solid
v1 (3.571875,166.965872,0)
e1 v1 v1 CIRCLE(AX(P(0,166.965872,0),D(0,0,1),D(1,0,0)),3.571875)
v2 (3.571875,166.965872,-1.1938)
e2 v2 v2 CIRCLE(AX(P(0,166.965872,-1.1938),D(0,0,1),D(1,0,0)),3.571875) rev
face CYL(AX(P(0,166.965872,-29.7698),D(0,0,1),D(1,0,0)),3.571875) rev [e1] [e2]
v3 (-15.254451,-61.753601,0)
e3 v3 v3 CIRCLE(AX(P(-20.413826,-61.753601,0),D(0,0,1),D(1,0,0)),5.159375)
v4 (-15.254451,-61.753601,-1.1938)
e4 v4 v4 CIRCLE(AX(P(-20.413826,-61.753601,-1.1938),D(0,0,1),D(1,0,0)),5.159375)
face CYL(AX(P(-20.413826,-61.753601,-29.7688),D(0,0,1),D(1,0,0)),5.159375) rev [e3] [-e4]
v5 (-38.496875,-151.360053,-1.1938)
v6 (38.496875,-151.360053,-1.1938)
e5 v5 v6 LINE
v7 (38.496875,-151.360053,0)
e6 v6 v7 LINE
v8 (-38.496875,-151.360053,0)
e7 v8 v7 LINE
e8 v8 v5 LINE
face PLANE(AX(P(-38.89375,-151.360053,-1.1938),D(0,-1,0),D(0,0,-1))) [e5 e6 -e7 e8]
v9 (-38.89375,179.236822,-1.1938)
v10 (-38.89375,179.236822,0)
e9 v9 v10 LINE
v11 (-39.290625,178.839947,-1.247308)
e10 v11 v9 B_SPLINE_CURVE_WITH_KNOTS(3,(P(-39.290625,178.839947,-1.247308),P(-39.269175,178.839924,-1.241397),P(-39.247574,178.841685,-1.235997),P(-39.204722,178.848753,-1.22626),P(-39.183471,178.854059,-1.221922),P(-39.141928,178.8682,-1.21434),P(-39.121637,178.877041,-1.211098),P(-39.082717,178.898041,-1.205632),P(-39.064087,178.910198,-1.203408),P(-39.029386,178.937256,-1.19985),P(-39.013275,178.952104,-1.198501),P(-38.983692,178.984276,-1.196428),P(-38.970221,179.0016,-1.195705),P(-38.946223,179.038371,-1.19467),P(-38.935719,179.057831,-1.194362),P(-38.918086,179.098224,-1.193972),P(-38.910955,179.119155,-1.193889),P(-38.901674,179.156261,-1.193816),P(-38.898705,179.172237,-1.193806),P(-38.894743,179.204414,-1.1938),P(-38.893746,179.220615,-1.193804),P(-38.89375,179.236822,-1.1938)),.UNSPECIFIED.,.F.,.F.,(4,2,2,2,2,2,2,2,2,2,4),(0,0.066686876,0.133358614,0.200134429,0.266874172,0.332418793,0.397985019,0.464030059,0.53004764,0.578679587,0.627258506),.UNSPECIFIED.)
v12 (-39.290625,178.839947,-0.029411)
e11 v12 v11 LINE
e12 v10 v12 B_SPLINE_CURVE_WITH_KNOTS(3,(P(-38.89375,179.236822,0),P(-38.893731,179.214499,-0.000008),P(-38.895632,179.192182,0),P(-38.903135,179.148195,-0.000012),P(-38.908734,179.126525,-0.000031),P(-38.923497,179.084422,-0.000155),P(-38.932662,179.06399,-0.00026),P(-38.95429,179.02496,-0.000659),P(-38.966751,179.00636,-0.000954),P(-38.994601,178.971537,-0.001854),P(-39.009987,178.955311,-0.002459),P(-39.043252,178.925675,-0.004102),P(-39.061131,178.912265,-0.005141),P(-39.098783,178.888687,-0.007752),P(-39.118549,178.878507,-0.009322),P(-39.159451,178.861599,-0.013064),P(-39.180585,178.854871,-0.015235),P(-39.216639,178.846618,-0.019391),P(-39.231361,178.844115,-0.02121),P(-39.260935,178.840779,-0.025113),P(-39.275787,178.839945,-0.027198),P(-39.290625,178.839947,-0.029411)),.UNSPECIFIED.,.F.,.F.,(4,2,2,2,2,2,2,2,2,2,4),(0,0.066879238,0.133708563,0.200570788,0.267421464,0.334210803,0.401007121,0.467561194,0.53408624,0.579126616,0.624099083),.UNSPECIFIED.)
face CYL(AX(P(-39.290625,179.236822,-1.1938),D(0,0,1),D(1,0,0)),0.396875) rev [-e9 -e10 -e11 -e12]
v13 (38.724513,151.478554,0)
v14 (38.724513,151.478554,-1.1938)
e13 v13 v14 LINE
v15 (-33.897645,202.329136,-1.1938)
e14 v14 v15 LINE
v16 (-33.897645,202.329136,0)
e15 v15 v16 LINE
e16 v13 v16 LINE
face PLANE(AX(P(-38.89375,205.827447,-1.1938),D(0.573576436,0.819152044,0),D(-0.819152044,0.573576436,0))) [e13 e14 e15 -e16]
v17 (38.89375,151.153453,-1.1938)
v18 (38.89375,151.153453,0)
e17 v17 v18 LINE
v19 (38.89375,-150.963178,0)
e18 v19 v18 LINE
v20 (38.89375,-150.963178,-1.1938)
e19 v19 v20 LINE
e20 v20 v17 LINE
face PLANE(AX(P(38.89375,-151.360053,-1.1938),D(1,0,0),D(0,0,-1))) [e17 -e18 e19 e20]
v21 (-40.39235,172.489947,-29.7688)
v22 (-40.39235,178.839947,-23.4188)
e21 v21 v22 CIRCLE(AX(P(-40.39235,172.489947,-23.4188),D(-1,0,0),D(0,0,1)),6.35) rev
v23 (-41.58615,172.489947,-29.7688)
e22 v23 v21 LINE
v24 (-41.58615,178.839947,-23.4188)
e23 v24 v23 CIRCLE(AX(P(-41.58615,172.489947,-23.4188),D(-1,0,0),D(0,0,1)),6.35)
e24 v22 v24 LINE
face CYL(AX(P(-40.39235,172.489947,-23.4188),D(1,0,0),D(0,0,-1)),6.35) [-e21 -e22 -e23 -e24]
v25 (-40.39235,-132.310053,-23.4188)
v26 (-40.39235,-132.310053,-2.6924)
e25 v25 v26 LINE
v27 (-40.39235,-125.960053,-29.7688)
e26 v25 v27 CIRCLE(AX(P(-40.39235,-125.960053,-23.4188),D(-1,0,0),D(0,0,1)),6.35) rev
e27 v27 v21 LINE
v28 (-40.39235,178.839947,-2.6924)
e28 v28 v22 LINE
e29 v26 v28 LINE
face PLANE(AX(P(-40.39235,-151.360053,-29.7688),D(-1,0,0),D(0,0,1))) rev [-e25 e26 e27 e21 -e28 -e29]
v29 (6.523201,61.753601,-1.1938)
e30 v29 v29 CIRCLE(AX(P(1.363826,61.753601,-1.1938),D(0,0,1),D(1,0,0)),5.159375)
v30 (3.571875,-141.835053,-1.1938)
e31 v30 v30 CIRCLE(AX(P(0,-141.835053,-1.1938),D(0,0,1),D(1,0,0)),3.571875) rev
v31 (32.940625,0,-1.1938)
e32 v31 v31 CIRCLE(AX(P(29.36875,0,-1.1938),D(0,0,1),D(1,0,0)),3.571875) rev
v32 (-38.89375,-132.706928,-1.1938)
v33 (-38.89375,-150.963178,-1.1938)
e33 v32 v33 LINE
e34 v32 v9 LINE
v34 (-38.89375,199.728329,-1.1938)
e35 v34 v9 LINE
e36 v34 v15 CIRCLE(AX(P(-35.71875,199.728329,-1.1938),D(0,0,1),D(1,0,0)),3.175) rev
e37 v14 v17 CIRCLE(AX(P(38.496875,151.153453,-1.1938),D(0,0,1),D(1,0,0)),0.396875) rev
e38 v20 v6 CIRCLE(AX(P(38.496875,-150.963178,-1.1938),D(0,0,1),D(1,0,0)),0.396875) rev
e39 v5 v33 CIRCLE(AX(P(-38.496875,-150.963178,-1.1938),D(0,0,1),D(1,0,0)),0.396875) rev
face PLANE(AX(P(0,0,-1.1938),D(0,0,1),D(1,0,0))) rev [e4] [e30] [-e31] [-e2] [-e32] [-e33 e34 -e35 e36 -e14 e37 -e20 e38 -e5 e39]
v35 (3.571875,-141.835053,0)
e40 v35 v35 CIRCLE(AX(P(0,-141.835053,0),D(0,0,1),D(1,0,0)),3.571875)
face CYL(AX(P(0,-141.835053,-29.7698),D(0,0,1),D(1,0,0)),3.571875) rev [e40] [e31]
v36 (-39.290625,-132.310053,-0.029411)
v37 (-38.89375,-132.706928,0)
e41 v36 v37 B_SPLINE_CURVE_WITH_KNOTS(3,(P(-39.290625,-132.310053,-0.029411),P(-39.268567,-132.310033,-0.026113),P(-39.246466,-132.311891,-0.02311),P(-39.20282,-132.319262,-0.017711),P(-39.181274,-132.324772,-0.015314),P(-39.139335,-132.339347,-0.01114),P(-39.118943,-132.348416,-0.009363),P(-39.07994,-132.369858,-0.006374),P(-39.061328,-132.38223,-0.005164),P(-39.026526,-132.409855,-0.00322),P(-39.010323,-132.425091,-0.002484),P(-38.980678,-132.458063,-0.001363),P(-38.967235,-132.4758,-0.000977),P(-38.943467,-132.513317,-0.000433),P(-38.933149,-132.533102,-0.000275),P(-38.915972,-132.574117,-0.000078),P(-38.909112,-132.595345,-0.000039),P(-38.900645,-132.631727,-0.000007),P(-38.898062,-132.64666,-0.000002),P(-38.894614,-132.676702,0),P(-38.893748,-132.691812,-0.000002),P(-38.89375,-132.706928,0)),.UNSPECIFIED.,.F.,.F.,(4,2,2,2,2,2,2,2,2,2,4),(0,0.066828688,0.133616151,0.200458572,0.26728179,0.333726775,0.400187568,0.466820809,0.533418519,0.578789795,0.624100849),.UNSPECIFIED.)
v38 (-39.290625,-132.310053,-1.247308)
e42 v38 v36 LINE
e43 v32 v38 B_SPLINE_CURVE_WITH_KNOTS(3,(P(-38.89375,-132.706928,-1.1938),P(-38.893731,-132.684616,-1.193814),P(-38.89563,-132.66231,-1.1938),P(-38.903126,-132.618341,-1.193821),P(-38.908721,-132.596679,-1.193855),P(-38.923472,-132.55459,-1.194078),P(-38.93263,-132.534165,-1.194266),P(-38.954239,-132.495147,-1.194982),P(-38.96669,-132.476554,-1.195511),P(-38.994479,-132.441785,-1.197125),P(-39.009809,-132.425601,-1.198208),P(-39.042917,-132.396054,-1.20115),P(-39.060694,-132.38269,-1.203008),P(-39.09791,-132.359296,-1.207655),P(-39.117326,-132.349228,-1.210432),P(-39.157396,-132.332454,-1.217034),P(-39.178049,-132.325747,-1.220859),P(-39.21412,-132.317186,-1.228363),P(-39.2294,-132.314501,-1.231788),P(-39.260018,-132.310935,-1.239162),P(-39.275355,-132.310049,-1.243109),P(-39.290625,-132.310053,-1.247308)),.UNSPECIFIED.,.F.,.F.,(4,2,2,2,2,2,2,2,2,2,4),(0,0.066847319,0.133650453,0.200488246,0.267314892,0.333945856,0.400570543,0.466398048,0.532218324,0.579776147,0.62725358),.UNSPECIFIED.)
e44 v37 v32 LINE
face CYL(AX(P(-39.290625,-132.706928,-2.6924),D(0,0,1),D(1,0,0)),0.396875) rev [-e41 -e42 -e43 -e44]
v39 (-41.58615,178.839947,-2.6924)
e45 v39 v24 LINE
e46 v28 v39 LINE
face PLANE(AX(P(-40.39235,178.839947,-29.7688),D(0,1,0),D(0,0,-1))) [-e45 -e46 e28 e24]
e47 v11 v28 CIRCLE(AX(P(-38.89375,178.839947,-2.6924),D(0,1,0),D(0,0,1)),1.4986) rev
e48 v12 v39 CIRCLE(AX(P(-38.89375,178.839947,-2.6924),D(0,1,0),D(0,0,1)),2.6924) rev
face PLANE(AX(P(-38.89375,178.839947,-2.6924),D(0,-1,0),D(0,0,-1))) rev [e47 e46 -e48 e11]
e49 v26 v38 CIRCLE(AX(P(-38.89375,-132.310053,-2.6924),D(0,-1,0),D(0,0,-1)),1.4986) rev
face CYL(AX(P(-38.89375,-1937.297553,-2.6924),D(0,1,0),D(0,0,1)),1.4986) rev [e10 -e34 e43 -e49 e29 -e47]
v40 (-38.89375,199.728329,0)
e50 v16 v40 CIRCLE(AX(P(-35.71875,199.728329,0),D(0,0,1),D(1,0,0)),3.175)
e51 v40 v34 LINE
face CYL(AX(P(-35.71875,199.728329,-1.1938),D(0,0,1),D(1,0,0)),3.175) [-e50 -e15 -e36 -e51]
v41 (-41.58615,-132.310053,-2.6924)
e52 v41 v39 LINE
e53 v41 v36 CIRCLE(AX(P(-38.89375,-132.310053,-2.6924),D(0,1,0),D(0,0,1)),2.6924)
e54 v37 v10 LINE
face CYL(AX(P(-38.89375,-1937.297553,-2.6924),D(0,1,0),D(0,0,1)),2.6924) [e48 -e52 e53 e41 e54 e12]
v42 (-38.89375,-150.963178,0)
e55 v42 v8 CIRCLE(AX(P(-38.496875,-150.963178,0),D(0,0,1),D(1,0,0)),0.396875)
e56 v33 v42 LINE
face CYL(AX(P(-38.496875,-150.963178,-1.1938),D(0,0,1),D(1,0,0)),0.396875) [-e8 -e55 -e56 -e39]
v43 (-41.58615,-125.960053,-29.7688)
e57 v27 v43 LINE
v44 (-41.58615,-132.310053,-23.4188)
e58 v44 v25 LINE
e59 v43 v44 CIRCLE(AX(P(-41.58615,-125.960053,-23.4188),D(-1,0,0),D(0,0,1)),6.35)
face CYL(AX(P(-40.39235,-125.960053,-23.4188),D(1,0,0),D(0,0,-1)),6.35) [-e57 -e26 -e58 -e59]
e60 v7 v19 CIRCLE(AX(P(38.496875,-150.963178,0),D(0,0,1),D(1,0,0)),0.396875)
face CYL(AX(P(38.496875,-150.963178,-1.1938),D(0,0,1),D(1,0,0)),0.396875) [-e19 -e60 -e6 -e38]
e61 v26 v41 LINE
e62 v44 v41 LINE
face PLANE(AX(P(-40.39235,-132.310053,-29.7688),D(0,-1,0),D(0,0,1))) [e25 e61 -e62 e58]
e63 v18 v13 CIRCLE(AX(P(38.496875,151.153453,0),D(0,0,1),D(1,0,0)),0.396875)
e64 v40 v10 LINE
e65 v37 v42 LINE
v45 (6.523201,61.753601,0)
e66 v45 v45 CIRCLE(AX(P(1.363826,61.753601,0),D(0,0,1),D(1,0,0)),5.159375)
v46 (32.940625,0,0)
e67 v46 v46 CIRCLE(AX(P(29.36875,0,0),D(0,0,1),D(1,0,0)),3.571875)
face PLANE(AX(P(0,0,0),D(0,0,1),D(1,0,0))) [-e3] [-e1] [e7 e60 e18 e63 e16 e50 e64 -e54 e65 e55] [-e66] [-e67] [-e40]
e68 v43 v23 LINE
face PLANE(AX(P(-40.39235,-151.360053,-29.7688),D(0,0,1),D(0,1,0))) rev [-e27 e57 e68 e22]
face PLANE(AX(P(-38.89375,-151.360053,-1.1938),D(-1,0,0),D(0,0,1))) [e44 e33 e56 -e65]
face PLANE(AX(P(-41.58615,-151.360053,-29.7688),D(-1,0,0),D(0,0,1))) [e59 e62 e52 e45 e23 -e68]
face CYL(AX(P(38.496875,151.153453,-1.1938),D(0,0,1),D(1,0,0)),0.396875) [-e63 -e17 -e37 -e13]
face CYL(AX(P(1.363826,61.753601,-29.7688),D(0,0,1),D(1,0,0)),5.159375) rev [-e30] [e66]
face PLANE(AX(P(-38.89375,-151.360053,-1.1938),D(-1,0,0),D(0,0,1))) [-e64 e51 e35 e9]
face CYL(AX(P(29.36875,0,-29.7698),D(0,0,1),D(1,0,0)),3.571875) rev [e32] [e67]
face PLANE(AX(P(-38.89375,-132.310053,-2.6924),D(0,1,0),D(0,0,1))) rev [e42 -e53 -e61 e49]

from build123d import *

# Parameters (mm, degrees)
BASE_FLANGE1_DEPTH  = 1.1938
MITER_START         = -132.310053061
MITER_FLANGE1_DEPTH = 311.15
FILLET2_R           = 3.175
CUT_EXTRUDE1_REACH  = 211.249
SKETCH12_R          = 3.571875
SKETCH13_R          = 5.159375
CUT_EXTRUDE2_DEPTH  = 210.249492514
FILLET3_R           = 6.35
FILLET4_R           = 0.396875


# Read off the part's stored shape, not the designer's step: Miter Flange1
# Sheet-metal steps are written as plain solids
with BuildPart() as part:
    # Sketch1 → Base-Flange1 (new body)
    with BuildSketch(Plane.XY):
        Polygon((-38.89375, -151.360053061), (38.89375, -151.360053061), (38.89375, 151.360053061), (-38.89375, 205.827446939), (-38.89375, 151.360053061), align=None)
    extrude(amount=-BASE_FLANGE1_DEPTH)

    # Miter Flange1 outline → Miter Flange1 (add)
    with BuildSketch(Plane(origin=(0, 0, 0), x_dir=(1, 0, 0), z_dir=(0, 1, 0)).offset(MITER_START)):
        with BuildLine():
            Line((-40.39235, 29.7688), (-41.58615, 29.7688))
            Line((-41.58615, 29.7688), (-41.58615, 2.6924))
            ThreePointArc((-41.58615, 2.6924), (-40.797564298, 0.788585702), (-38.89375, 0))
            Line((-38.89375, 0), (-38.89375, 1.1938))
            ThreePointArc((-38.89375, 1.1938), (-39.953420222, 1.632729778), (-40.39235, 2.6924))
            Line((-40.39235, 2.6924), (-40.39235, 29.7688))
        make_face()
    extrude(amount=MITER_FLANGE1_DEPTH)

    # Fillet2
    fillet2_edges = [part.edges().sort_by_distance(p)[0] for p in [
        (-38.89375, 205.827446939, -0.5969),
    ]]
    fillet(fillet2_edges, radius=FILLET2_R)

    # Sketch12 → Cut-Extrude1 (cut, up to next)
    with BuildSketch(Plane.XY, mode=Mode.PRIVATE) as cut_extrude1_sk1:
        with Locations((29.36875, 0)):
            Circle(SKETCH12_R)
    cut_extrude1_tool1 = extrude(cut_extrude1_sk1.sketch, amount=-CUT_EXTRUDE1_REACH, mode=Mode.PRIVATE) & part.part
    # Sketch12 → Cut-Extrude1 (cut, up to next)
    with BuildSketch(Plane.XY, mode=Mode.PRIVATE) as cut_extrude1_sk2:
        with Locations((0, -141.835053061)):
            Circle(SKETCH12_R)
    cut_extrude1_tool2 = extrude(cut_extrude1_sk2.sketch, amount=-CUT_EXTRUDE1_REACH, mode=Mode.PRIVATE) & part.part
    # Sketch12 → Cut-Extrude1 (cut, up to next)
    with BuildSketch(Plane.XY, mode=Mode.PRIVATE) as cut_extrude1_sk3:
        with Locations((0, 166.965872042)):
            Circle(SKETCH12_R)
    cut_extrude1_tool3 = extrude(cut_extrude1_sk3.sketch, amount=-CUT_EXTRUDE1_REACH, mode=Mode.PRIVATE) & part.part
    add(cut_extrude1_tool1.solids().sort_by_distance((29.36875, 0, 0))[0], mode=Mode.SUBTRACT)
    add(cut_extrude1_tool2.solids().sort_by_distance((0, -141.835053, 0))[0], mode=Mode.SUBTRACT)
    add(cut_extrude1_tool3.solids().sort_by_distance((0, 166.965872, 0))[0], mode=Mode.SUBTRACT)

    # Sketch13 → Cut-Extrude2 (cut, through all)
    with BuildSketch(Plane.XY):
        with Locations((1.363826041, 61.753601162)):
            Circle(SKETCH13_R)
        with Locations((-20.413826041, -61.753601162)):
            Circle(SKETCH13_R)
    extrude(amount=-CUT_EXTRUDE2_DEPTH, mode=Mode.SUBTRACT)

    # Fillet3
    fillet3_edges = [part.edges().sort_by_distance(p)[0] for p in [
        (-40.98925, -132.310053061, -29.7688),
        (-40.98925, 178.839946939, -29.7688),
    ]]
    fillet(fillet3_edges, radius=FILLET3_R)

    # Fillet4
    # the kernel refuses this fillet: 0.396875 mm, written as the material it adds along each edge
    with BuildSketch(Plane(origin=(-38.89375, -132.310053061, 0.9921875), x_dir=(-1, 0, 0), z_dir=(0, 0, -1))) as fillet4_piece_1_section:
        with BuildLine():
            CenterArc((FILLET4_R, -FILLET4_R), FILLET4_R, 90, 90)
            Line((0, -FILLET4_R), (0, 0))
            Line((0, 0), (FILLET4_R, 0))
        make_face()
    fillet4_piece_1 = extrude(amount=3.178175, mode=Mode.PRIVATE)
    fillet4_piece_1 = fillet4_piece_1 & Plane(origin=(-38.893750001, -132.398815537, -2.692399999), x_dir=(-1.0, 0, -4.2270187104329246e-10), z_dir=(0, -1, 0)) * Cylinder(2.692399999, 8, mode=Mode.PRIVATE)
    fillet4_piece_1 = fillet4_piece_1 - Plane(origin=(-38.893749999, -132.398815537, -2.692400001), x_dir=(-6.519535415155748e-10, 0, 1.0), z_dir=(0, -1, 0)) * Cylinder(1.498600001, 8, mode=Mode.PRIVATE)
    add(fillet4_piece_1)
    with BuildSketch(Plane(origin=(-38.89375, 178.839946939, 0.9921875), x_dir=(-1, 0, 0), z_dir=(0, 0, -1))) as fillet4_piece_2_section:
        with BuildLine():
            CenterArc((FILLET4_R, FILLET4_R), FILLET4_R, 180, 90)
            Line((0, FILLET4_R), (0, 0))
            Line((0, 0), (FILLET4_R, 0))
        make_face()
    fillet4_piece_2 = extrude(amount=3.178175, mode=Mode.PRIVATE)
    fillet4_piece_2 = fillet4_piece_2 & Plane(origin=(-38.893750001, 178.928709436, -2.692399999), x_dir=(-1.0, 0, -4.2270187104329246e-10), z_dir=(0, -1, 0)) * Cylinder(2.692399999, 8, mode=Mode.PRIVATE)
    fillet4_piece_2 = fillet4_piece_2 - Plane(origin=(-38.893749999, 178.928709436, -2.692400001), x_dir=(-6.519535415155748e-10, 0, 1.0), z_dir=(0, -1, 0)) * Cylinder(1.498600001, 8, mode=Mode.PRIVATE)
    add(fillet4_piece_2)
    # the kernel refuses this fillet: 0.396875 mm, written as the material it takes off along each edge
    with BuildSketch(Plane(origin=(38.89375, 151.360053061, 0.51650012), x_dir=(0, -1, 0), z_dir=(0, 0, -1))) as fillet4_2_piece_1:
        with BuildLine():
            CenterArc((FILLET4_R * 0.520567050552, FILLET4_R), FILLET4_R, 215, 55)
            Line((-FILLET4_R * 0.298584993737, FILLET4_R * 0.426423563649), (0, 0))
            Line((0, 0), (FILLET4_R * 0.520567050552, 0))
        make_face()
    extrude(amount=2.226800241, mode=Mode.SUBTRACT)
    with BuildSketch(Plane(origin=(38.89375, -151.360053061, 0.9921875), x_dir=(0, 1, 0), z_dir=(0, 0, -1))) as fillet4_2_piece_2:
        with BuildLine():
            CenterArc((FILLET4_R, -FILLET4_R), FILLET4_R, 90, 90)
            Line((0, -FILLET4_R), (0, 0))
            Line((0, 0), (FILLET4_R, 0))
        make_face()
    extrude(amount=3.178175, mode=Mode.SUBTRACT)
    with BuildSketch(Plane(origin=(-38.89375, -151.360053061, 0.9921875), x_dir=(0, 1, 0), z_dir=(0, 0, -1))) as fillet4_2_piece_3:
        with BuildLine():
            CenterArc((FILLET4_R, FILLET4_R), FILLET4_R, 180, 90)
            Line((0, FILLET4_R), (0, 0))
            Line((0, 0), (FILLET4_R, 0))
        make_face()
    extrude(amount=3.178175, mode=Mode.SUBTRACT)


solid = part.part
